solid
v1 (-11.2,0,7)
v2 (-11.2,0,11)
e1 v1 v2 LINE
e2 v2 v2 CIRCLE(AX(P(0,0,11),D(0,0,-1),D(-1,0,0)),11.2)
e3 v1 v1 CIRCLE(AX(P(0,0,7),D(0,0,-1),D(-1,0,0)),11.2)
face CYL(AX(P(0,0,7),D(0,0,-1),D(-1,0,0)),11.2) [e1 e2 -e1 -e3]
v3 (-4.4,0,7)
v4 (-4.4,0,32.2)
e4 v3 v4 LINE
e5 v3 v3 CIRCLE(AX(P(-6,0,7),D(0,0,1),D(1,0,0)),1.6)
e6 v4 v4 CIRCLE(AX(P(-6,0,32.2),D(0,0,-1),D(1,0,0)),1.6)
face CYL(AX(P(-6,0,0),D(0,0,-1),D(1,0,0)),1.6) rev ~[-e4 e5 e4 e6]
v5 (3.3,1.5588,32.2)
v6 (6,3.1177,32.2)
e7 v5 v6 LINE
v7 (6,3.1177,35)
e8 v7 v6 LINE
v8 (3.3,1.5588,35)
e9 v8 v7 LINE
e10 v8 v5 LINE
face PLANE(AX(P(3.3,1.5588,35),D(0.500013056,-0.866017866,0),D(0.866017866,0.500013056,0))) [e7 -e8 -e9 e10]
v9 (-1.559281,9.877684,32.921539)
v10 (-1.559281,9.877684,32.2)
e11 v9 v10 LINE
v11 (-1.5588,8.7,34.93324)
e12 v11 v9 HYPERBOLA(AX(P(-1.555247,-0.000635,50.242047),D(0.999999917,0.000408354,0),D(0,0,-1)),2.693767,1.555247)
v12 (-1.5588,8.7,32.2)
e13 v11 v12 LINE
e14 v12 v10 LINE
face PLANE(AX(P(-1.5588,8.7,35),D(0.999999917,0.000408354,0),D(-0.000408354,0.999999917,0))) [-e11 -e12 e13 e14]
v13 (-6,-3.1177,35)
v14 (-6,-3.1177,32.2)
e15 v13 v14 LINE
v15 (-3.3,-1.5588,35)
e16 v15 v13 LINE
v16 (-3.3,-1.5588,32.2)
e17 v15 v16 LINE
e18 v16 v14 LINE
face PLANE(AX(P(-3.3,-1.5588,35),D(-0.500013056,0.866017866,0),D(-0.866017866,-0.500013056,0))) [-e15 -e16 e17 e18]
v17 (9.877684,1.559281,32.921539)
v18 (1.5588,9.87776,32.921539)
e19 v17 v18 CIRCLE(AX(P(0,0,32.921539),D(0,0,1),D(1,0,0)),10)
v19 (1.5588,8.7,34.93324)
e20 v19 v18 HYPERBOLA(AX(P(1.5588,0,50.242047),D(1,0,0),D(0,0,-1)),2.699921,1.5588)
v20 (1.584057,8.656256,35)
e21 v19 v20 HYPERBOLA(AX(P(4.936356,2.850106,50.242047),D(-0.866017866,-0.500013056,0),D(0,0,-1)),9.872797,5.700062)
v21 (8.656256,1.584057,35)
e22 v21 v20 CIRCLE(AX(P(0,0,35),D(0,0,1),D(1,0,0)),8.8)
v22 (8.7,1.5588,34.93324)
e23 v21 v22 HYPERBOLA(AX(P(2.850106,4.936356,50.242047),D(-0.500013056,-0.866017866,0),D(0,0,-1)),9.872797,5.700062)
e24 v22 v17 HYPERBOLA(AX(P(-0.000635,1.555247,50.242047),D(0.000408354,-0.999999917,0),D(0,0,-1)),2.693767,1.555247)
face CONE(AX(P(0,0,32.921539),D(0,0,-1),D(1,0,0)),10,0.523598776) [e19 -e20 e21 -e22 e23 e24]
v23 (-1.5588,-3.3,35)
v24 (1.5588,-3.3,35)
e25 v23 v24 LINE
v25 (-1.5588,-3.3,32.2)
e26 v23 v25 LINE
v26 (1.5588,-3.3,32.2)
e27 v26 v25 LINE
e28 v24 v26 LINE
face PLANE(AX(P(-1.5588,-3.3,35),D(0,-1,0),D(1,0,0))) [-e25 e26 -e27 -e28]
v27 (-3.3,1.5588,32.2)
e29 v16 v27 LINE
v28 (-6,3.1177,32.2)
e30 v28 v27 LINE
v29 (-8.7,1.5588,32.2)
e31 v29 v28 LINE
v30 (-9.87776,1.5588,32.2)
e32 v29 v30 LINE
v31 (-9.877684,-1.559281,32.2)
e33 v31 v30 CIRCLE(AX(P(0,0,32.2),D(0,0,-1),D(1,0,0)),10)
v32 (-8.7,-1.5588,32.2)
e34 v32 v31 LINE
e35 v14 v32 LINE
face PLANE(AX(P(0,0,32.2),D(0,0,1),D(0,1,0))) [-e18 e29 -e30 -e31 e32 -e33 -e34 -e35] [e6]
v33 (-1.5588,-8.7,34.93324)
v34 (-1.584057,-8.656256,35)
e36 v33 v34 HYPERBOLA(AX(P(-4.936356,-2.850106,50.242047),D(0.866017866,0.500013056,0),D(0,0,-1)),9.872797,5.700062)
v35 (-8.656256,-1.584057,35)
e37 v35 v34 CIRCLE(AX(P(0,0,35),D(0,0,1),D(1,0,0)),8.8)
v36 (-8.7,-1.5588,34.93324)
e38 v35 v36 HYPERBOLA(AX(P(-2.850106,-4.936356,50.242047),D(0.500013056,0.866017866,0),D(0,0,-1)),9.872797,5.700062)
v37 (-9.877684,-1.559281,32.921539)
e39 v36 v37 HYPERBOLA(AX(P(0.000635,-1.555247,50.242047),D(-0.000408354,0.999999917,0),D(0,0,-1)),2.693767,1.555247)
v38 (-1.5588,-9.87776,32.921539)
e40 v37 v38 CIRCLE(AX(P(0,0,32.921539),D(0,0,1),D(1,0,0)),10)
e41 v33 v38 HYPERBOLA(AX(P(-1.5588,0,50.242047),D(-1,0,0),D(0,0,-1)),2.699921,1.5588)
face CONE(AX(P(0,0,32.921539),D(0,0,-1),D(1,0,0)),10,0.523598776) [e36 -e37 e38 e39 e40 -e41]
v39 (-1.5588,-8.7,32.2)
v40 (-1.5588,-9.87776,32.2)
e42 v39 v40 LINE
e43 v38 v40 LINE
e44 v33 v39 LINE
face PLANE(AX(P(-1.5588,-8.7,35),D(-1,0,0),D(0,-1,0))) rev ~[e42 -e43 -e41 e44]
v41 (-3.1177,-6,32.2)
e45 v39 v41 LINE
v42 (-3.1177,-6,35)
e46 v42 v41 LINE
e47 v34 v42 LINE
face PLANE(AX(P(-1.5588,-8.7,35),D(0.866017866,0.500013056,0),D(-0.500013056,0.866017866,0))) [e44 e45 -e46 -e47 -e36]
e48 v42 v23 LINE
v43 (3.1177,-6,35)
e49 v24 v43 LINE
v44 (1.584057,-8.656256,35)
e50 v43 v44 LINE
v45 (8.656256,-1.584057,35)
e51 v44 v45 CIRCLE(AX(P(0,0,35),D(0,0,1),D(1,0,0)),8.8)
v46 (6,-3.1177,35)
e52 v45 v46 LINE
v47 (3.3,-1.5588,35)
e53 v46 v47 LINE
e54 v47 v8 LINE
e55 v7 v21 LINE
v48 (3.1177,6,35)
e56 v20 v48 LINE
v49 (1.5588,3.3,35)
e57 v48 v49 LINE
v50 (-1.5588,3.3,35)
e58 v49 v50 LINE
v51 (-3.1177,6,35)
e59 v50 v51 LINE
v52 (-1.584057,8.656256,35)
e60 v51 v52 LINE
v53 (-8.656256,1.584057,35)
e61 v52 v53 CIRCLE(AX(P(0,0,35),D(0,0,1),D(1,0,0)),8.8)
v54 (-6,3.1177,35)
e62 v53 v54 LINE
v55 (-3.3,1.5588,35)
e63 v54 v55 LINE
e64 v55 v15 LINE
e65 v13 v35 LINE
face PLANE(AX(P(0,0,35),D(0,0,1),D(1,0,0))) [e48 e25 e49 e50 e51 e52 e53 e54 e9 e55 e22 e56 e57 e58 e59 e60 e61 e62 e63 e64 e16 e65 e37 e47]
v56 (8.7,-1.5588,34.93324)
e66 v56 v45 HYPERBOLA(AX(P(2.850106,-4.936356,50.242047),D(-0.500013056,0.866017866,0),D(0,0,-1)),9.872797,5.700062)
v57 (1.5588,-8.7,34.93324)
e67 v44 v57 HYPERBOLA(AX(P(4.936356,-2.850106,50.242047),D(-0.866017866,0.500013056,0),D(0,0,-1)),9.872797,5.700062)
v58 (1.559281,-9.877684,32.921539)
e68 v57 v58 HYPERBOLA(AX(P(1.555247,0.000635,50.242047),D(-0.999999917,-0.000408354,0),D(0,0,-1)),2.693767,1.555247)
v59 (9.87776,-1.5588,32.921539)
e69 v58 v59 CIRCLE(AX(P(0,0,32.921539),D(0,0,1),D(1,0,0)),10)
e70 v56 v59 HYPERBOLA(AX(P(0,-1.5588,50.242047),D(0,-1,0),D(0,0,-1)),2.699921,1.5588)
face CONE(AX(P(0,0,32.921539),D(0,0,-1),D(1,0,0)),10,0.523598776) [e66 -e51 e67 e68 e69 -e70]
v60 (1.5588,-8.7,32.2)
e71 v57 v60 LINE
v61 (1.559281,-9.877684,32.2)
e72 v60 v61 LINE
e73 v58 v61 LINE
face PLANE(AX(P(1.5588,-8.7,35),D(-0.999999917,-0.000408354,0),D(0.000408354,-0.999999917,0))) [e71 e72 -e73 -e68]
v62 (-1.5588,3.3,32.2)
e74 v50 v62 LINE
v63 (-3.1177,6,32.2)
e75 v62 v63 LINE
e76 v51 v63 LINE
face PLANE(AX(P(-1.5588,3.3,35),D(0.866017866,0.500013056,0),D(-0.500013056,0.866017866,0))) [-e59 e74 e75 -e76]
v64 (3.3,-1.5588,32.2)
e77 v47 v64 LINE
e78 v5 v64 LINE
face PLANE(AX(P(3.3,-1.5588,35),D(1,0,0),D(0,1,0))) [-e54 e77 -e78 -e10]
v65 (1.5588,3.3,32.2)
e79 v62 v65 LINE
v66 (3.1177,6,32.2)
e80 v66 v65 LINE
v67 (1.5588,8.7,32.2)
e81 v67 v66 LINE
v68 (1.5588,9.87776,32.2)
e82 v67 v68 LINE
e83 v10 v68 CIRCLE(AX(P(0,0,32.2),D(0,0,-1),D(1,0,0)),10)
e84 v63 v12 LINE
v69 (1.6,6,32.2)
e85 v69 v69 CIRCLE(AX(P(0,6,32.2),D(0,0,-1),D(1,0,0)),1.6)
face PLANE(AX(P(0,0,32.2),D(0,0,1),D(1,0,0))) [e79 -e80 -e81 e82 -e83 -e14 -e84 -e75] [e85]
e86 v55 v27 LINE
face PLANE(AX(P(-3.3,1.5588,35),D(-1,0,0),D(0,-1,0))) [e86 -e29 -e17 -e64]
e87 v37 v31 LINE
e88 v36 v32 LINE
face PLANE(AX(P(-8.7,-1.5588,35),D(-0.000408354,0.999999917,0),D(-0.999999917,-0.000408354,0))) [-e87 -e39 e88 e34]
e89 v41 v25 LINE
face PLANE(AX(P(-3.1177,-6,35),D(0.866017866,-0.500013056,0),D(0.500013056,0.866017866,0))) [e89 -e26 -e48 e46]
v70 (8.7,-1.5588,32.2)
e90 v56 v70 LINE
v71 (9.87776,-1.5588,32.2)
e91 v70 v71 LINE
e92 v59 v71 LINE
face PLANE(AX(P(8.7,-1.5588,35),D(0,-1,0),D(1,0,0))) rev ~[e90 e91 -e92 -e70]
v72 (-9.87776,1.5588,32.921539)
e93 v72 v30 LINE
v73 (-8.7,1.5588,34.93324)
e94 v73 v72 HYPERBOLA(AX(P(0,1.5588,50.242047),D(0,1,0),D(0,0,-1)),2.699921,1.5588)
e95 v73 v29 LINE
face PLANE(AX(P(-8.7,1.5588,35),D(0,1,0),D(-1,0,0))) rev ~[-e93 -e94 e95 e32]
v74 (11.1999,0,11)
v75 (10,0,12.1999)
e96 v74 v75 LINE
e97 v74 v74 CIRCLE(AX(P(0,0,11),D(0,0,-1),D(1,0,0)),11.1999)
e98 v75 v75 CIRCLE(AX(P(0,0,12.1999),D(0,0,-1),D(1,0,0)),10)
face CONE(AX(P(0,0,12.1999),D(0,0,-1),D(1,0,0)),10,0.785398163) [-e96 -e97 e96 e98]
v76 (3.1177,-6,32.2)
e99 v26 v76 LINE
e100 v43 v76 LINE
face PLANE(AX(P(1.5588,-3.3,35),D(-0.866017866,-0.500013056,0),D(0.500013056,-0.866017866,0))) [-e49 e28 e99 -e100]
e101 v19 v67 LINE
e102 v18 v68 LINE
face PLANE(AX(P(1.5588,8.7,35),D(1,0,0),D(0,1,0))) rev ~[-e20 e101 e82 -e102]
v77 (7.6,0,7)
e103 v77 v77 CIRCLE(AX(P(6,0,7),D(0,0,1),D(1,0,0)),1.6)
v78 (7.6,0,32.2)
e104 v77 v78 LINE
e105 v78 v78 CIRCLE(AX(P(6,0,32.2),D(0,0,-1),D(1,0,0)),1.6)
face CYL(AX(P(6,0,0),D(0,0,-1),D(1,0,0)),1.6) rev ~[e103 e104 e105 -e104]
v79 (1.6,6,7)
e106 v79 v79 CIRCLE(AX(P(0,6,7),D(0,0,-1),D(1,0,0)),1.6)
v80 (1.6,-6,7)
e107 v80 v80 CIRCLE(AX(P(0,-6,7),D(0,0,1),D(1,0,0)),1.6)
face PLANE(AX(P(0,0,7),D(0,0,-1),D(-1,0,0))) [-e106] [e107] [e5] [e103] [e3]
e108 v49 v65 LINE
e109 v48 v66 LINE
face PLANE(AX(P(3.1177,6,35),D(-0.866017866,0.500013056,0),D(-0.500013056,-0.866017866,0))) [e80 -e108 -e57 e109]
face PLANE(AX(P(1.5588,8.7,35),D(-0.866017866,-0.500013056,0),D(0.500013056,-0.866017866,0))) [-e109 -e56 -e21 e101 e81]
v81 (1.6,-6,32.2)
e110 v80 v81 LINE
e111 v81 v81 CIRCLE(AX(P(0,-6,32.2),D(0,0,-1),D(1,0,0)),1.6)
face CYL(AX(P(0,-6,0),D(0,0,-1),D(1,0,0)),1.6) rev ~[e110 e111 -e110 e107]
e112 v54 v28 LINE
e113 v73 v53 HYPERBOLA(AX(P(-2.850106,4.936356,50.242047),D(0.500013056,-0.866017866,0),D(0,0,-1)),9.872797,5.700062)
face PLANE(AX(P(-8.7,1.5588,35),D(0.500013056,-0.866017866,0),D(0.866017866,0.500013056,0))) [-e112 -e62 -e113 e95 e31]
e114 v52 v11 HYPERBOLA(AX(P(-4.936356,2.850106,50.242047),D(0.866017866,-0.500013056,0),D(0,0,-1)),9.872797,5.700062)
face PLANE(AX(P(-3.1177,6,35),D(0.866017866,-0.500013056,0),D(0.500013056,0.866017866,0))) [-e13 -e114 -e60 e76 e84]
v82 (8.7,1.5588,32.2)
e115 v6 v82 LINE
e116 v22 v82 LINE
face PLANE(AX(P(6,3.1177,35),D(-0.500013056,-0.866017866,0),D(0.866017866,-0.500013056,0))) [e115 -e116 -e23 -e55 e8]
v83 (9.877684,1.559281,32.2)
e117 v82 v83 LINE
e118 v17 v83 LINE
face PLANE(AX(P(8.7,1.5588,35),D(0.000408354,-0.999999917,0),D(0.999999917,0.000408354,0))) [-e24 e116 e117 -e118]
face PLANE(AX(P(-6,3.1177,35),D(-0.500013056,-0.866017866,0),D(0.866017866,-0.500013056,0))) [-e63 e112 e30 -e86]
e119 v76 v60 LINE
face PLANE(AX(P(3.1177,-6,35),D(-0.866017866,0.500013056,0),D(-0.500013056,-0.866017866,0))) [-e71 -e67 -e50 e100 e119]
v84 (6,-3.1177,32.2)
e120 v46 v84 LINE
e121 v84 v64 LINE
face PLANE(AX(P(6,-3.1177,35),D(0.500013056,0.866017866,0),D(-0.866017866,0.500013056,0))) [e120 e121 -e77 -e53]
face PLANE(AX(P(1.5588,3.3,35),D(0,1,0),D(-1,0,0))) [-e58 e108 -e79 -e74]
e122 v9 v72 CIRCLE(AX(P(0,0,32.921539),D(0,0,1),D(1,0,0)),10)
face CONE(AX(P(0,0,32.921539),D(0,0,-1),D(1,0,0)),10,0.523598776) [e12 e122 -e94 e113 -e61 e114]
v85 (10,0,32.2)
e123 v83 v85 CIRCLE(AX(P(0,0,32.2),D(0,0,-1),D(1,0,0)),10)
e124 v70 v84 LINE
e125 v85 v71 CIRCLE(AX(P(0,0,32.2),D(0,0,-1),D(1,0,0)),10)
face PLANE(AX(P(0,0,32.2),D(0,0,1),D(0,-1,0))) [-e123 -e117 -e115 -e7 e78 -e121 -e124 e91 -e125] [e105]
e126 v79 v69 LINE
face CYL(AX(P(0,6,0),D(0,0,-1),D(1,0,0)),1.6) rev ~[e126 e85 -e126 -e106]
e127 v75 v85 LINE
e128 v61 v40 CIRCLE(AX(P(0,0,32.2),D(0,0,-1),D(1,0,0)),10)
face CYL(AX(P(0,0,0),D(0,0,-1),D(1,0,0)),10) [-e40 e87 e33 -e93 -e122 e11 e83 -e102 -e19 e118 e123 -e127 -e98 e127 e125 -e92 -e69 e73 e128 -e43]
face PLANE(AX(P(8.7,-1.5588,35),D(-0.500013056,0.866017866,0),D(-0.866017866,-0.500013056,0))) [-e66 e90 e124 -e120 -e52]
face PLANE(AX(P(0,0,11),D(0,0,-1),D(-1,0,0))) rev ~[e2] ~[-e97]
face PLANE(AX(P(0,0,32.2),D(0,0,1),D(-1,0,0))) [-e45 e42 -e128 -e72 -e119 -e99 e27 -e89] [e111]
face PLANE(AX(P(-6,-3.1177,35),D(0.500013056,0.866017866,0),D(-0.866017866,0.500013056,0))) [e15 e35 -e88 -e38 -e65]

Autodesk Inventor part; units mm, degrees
ref_plane "YZ Plane" through (0, 0, 0) normal (1, 0, 0) x (0, 1, 0)
ref_plane "XZ Plane" through (0, 0, 0) normal (0, 1, 0) x (-1, 0, 0)
ref_plane "XY Plane" through (0, 0, 0) normal (0, 0, 1) x (1, 0, 0)
sketch "스케치1" plane through (0, 0, 0) normal (0, 0, 1) x (1, 0, 0)
  circle A0 centre (0, 0) radius 10
  line L0 (0, 0) -> (6, 0)
  line L1 (0, 0) -> (0, 6.1705) construction
  circle A1 centre (6, 0) radius 1.6
  circle A2 centre (-6, 0) radius 1.6
  line L2 (0, 0) -> (0, -6)
  circle A3 centre (0, -6) radius 1.6
  circle A4 centre (0, 6) radius 1.6
  dimension "d0" = 20
  dimension "d1" = 6
  dimension "d2" = 3.2
  dimension "d22" = 6
  dimension "d23" = 3.2
extrude "돌출1" add sketch "스케치1" along normal blind 35
sketch "스케치2" plane through (0, 0, 35) normal (0, 0, 1) x (1, 0, 0)
  line L0 (6, 0) -> (3.3, 0)
  line L1 (3.3, 1.5588) -> (6, 3.1177)
  line L2 (6, 3.1177) -> (8.7, 1.5588)
  line L3 (8.7, 1.5588) -> (8.7, -1.5588)
  line L4 (8.7, -1.5588) -> (6, -3.1177)
  line L5 (6, -3.1177) -> (3.3, -1.5588)
  line L6 (3.3, -1.5588) -> (3.3, 1.5588)
  line L7 (0, 6) -> (0, 3.3)
  line L8 (-1.5588, 3.3) -> (-3.1177, 6)
  line L9 (-3.1177, 6) -> (-1.5588, 8.7)
  line L10 (-1.5588, 8.7) -> (1.5588, 8.7)
  line L11 (1.5588, 8.7) -> (3.1177, 6)
  line L12 (3.1177, 6) -> (1.5588, 3.3)
  line L13 (1.5588, 3.3) -> (-1.5588, 3.3)
  line L14 (-6, 0) -> (-3.3, 0)
  line L15 (-3.3, -1.5588) -> (-6, -3.1177)
  line L16 (-6, -3.1177) -> (-8.7, -1.5588)
  line L17 (-8.7, -1.5588) -> (-8.7, 1.5588)
  line L18 (-8.7, 1.5588) -> (-6, 3.1177)
  line L19 (-6, 3.1177) -> (-3.3, 1.5588)
  line L20 (-3.3, 1.5588) -> (-3.3, -1.5588)
  line L21 (0, -6) -> (0, -3.3)
  line L22 (1.5588, -3.3) -> (3.1177, -6)
  line L23 (3.1177, -6) -> (1.5588, -8.7)
  line L24 (1.5588, -8.7) -> (-1.5588, -8.7)
  line L25 (-1.5588, -8.7) -> (-3.1177, -6)
  line L26 (-3.1177, -6) -> (-1.5588, -3.3)
  line L27 (-1.5588, -3.3) -> (1.5588, -3.3)
  point P0 (0, 0)
  point P1 (0, 6)
  point P2 (0, -6)
  dimension "d24" = 2.7
  dimension "d27" = 360
sketch "스케치3" plane through (0, 0, 0) normal (0, 0, -1) x (-1, 0, 0)
  circle A0 centre (0, 0) radius 10 projected
  circle A1 centre (-6, 0) radius 1.6 projected
  circle A2 centre (6, 0) radius 1.6 projected
extrude "돌출3" cut sketch "스케치3" against normal blind 7
sketch "스케치4" plane through (0, 0, 7) normal (0, 0, -1) x (-1, 0, 0)
  circle A0 centre (0, 0) radius 10 projected
  circle A1 centre (0, 0) radius 11.2
  dimension "d13" = 1.2
extrude "돌출4" add sketch "스케치4" against normal blind 4
chamfer "모따기2" distance 1.2 angle 45 1 edges at (-10, 0, 11)
chamfer "모따기3" distance 1.2 angle 60 1 edges at (-10, 0, 35) measured on face at (0.0643, -1.4706, 35)
extrude "돌출5" cut sketch "스케치2" against normal blind 2.8
sketch "스케치5" plane through (0, 0, 35) normal (0, 0, 1) x (1, 0, 0)
  circle A0 centre (0, 6) radius 1.6 projected
  line L0 (1.5588, 8.7) -> (3.1177, 6) projected
  line L1 (-1.5588, 8.7) -> (1.5588, 8.7) projected
  line L2 (-3.1177, 6) -> (-1.5588, 8.7) projected
  line L3 (-1.5588, 3.3) -> (-3.1177, 6) projected
  line L4 (1.5588, 3.3) -> (-1.5588, 3.3) projected
  line L5 (3.1177, 6) -> (1.5588, 3.3) projected
  line L6 (1.5588, 8.7) -> (1.5588, 10.4142)
  line L7 (1.5588, 10.4142) -> (-1.5595, 10.4142)
  line L8 (-1.5588, 8.7) -> (-1.5588, 10.4142)
  point P0 (0, 0)
extrude "돌출6" cut sketch "스케치5" against normal blind 2.8 contours L1 L8 L7 L6
pattern_circular "원형 패턴1" count 4 over 360 about axis through (0, 0, 0) along (0, 0, 1) of "돌출6"
properties part number "Test_Shaft"
